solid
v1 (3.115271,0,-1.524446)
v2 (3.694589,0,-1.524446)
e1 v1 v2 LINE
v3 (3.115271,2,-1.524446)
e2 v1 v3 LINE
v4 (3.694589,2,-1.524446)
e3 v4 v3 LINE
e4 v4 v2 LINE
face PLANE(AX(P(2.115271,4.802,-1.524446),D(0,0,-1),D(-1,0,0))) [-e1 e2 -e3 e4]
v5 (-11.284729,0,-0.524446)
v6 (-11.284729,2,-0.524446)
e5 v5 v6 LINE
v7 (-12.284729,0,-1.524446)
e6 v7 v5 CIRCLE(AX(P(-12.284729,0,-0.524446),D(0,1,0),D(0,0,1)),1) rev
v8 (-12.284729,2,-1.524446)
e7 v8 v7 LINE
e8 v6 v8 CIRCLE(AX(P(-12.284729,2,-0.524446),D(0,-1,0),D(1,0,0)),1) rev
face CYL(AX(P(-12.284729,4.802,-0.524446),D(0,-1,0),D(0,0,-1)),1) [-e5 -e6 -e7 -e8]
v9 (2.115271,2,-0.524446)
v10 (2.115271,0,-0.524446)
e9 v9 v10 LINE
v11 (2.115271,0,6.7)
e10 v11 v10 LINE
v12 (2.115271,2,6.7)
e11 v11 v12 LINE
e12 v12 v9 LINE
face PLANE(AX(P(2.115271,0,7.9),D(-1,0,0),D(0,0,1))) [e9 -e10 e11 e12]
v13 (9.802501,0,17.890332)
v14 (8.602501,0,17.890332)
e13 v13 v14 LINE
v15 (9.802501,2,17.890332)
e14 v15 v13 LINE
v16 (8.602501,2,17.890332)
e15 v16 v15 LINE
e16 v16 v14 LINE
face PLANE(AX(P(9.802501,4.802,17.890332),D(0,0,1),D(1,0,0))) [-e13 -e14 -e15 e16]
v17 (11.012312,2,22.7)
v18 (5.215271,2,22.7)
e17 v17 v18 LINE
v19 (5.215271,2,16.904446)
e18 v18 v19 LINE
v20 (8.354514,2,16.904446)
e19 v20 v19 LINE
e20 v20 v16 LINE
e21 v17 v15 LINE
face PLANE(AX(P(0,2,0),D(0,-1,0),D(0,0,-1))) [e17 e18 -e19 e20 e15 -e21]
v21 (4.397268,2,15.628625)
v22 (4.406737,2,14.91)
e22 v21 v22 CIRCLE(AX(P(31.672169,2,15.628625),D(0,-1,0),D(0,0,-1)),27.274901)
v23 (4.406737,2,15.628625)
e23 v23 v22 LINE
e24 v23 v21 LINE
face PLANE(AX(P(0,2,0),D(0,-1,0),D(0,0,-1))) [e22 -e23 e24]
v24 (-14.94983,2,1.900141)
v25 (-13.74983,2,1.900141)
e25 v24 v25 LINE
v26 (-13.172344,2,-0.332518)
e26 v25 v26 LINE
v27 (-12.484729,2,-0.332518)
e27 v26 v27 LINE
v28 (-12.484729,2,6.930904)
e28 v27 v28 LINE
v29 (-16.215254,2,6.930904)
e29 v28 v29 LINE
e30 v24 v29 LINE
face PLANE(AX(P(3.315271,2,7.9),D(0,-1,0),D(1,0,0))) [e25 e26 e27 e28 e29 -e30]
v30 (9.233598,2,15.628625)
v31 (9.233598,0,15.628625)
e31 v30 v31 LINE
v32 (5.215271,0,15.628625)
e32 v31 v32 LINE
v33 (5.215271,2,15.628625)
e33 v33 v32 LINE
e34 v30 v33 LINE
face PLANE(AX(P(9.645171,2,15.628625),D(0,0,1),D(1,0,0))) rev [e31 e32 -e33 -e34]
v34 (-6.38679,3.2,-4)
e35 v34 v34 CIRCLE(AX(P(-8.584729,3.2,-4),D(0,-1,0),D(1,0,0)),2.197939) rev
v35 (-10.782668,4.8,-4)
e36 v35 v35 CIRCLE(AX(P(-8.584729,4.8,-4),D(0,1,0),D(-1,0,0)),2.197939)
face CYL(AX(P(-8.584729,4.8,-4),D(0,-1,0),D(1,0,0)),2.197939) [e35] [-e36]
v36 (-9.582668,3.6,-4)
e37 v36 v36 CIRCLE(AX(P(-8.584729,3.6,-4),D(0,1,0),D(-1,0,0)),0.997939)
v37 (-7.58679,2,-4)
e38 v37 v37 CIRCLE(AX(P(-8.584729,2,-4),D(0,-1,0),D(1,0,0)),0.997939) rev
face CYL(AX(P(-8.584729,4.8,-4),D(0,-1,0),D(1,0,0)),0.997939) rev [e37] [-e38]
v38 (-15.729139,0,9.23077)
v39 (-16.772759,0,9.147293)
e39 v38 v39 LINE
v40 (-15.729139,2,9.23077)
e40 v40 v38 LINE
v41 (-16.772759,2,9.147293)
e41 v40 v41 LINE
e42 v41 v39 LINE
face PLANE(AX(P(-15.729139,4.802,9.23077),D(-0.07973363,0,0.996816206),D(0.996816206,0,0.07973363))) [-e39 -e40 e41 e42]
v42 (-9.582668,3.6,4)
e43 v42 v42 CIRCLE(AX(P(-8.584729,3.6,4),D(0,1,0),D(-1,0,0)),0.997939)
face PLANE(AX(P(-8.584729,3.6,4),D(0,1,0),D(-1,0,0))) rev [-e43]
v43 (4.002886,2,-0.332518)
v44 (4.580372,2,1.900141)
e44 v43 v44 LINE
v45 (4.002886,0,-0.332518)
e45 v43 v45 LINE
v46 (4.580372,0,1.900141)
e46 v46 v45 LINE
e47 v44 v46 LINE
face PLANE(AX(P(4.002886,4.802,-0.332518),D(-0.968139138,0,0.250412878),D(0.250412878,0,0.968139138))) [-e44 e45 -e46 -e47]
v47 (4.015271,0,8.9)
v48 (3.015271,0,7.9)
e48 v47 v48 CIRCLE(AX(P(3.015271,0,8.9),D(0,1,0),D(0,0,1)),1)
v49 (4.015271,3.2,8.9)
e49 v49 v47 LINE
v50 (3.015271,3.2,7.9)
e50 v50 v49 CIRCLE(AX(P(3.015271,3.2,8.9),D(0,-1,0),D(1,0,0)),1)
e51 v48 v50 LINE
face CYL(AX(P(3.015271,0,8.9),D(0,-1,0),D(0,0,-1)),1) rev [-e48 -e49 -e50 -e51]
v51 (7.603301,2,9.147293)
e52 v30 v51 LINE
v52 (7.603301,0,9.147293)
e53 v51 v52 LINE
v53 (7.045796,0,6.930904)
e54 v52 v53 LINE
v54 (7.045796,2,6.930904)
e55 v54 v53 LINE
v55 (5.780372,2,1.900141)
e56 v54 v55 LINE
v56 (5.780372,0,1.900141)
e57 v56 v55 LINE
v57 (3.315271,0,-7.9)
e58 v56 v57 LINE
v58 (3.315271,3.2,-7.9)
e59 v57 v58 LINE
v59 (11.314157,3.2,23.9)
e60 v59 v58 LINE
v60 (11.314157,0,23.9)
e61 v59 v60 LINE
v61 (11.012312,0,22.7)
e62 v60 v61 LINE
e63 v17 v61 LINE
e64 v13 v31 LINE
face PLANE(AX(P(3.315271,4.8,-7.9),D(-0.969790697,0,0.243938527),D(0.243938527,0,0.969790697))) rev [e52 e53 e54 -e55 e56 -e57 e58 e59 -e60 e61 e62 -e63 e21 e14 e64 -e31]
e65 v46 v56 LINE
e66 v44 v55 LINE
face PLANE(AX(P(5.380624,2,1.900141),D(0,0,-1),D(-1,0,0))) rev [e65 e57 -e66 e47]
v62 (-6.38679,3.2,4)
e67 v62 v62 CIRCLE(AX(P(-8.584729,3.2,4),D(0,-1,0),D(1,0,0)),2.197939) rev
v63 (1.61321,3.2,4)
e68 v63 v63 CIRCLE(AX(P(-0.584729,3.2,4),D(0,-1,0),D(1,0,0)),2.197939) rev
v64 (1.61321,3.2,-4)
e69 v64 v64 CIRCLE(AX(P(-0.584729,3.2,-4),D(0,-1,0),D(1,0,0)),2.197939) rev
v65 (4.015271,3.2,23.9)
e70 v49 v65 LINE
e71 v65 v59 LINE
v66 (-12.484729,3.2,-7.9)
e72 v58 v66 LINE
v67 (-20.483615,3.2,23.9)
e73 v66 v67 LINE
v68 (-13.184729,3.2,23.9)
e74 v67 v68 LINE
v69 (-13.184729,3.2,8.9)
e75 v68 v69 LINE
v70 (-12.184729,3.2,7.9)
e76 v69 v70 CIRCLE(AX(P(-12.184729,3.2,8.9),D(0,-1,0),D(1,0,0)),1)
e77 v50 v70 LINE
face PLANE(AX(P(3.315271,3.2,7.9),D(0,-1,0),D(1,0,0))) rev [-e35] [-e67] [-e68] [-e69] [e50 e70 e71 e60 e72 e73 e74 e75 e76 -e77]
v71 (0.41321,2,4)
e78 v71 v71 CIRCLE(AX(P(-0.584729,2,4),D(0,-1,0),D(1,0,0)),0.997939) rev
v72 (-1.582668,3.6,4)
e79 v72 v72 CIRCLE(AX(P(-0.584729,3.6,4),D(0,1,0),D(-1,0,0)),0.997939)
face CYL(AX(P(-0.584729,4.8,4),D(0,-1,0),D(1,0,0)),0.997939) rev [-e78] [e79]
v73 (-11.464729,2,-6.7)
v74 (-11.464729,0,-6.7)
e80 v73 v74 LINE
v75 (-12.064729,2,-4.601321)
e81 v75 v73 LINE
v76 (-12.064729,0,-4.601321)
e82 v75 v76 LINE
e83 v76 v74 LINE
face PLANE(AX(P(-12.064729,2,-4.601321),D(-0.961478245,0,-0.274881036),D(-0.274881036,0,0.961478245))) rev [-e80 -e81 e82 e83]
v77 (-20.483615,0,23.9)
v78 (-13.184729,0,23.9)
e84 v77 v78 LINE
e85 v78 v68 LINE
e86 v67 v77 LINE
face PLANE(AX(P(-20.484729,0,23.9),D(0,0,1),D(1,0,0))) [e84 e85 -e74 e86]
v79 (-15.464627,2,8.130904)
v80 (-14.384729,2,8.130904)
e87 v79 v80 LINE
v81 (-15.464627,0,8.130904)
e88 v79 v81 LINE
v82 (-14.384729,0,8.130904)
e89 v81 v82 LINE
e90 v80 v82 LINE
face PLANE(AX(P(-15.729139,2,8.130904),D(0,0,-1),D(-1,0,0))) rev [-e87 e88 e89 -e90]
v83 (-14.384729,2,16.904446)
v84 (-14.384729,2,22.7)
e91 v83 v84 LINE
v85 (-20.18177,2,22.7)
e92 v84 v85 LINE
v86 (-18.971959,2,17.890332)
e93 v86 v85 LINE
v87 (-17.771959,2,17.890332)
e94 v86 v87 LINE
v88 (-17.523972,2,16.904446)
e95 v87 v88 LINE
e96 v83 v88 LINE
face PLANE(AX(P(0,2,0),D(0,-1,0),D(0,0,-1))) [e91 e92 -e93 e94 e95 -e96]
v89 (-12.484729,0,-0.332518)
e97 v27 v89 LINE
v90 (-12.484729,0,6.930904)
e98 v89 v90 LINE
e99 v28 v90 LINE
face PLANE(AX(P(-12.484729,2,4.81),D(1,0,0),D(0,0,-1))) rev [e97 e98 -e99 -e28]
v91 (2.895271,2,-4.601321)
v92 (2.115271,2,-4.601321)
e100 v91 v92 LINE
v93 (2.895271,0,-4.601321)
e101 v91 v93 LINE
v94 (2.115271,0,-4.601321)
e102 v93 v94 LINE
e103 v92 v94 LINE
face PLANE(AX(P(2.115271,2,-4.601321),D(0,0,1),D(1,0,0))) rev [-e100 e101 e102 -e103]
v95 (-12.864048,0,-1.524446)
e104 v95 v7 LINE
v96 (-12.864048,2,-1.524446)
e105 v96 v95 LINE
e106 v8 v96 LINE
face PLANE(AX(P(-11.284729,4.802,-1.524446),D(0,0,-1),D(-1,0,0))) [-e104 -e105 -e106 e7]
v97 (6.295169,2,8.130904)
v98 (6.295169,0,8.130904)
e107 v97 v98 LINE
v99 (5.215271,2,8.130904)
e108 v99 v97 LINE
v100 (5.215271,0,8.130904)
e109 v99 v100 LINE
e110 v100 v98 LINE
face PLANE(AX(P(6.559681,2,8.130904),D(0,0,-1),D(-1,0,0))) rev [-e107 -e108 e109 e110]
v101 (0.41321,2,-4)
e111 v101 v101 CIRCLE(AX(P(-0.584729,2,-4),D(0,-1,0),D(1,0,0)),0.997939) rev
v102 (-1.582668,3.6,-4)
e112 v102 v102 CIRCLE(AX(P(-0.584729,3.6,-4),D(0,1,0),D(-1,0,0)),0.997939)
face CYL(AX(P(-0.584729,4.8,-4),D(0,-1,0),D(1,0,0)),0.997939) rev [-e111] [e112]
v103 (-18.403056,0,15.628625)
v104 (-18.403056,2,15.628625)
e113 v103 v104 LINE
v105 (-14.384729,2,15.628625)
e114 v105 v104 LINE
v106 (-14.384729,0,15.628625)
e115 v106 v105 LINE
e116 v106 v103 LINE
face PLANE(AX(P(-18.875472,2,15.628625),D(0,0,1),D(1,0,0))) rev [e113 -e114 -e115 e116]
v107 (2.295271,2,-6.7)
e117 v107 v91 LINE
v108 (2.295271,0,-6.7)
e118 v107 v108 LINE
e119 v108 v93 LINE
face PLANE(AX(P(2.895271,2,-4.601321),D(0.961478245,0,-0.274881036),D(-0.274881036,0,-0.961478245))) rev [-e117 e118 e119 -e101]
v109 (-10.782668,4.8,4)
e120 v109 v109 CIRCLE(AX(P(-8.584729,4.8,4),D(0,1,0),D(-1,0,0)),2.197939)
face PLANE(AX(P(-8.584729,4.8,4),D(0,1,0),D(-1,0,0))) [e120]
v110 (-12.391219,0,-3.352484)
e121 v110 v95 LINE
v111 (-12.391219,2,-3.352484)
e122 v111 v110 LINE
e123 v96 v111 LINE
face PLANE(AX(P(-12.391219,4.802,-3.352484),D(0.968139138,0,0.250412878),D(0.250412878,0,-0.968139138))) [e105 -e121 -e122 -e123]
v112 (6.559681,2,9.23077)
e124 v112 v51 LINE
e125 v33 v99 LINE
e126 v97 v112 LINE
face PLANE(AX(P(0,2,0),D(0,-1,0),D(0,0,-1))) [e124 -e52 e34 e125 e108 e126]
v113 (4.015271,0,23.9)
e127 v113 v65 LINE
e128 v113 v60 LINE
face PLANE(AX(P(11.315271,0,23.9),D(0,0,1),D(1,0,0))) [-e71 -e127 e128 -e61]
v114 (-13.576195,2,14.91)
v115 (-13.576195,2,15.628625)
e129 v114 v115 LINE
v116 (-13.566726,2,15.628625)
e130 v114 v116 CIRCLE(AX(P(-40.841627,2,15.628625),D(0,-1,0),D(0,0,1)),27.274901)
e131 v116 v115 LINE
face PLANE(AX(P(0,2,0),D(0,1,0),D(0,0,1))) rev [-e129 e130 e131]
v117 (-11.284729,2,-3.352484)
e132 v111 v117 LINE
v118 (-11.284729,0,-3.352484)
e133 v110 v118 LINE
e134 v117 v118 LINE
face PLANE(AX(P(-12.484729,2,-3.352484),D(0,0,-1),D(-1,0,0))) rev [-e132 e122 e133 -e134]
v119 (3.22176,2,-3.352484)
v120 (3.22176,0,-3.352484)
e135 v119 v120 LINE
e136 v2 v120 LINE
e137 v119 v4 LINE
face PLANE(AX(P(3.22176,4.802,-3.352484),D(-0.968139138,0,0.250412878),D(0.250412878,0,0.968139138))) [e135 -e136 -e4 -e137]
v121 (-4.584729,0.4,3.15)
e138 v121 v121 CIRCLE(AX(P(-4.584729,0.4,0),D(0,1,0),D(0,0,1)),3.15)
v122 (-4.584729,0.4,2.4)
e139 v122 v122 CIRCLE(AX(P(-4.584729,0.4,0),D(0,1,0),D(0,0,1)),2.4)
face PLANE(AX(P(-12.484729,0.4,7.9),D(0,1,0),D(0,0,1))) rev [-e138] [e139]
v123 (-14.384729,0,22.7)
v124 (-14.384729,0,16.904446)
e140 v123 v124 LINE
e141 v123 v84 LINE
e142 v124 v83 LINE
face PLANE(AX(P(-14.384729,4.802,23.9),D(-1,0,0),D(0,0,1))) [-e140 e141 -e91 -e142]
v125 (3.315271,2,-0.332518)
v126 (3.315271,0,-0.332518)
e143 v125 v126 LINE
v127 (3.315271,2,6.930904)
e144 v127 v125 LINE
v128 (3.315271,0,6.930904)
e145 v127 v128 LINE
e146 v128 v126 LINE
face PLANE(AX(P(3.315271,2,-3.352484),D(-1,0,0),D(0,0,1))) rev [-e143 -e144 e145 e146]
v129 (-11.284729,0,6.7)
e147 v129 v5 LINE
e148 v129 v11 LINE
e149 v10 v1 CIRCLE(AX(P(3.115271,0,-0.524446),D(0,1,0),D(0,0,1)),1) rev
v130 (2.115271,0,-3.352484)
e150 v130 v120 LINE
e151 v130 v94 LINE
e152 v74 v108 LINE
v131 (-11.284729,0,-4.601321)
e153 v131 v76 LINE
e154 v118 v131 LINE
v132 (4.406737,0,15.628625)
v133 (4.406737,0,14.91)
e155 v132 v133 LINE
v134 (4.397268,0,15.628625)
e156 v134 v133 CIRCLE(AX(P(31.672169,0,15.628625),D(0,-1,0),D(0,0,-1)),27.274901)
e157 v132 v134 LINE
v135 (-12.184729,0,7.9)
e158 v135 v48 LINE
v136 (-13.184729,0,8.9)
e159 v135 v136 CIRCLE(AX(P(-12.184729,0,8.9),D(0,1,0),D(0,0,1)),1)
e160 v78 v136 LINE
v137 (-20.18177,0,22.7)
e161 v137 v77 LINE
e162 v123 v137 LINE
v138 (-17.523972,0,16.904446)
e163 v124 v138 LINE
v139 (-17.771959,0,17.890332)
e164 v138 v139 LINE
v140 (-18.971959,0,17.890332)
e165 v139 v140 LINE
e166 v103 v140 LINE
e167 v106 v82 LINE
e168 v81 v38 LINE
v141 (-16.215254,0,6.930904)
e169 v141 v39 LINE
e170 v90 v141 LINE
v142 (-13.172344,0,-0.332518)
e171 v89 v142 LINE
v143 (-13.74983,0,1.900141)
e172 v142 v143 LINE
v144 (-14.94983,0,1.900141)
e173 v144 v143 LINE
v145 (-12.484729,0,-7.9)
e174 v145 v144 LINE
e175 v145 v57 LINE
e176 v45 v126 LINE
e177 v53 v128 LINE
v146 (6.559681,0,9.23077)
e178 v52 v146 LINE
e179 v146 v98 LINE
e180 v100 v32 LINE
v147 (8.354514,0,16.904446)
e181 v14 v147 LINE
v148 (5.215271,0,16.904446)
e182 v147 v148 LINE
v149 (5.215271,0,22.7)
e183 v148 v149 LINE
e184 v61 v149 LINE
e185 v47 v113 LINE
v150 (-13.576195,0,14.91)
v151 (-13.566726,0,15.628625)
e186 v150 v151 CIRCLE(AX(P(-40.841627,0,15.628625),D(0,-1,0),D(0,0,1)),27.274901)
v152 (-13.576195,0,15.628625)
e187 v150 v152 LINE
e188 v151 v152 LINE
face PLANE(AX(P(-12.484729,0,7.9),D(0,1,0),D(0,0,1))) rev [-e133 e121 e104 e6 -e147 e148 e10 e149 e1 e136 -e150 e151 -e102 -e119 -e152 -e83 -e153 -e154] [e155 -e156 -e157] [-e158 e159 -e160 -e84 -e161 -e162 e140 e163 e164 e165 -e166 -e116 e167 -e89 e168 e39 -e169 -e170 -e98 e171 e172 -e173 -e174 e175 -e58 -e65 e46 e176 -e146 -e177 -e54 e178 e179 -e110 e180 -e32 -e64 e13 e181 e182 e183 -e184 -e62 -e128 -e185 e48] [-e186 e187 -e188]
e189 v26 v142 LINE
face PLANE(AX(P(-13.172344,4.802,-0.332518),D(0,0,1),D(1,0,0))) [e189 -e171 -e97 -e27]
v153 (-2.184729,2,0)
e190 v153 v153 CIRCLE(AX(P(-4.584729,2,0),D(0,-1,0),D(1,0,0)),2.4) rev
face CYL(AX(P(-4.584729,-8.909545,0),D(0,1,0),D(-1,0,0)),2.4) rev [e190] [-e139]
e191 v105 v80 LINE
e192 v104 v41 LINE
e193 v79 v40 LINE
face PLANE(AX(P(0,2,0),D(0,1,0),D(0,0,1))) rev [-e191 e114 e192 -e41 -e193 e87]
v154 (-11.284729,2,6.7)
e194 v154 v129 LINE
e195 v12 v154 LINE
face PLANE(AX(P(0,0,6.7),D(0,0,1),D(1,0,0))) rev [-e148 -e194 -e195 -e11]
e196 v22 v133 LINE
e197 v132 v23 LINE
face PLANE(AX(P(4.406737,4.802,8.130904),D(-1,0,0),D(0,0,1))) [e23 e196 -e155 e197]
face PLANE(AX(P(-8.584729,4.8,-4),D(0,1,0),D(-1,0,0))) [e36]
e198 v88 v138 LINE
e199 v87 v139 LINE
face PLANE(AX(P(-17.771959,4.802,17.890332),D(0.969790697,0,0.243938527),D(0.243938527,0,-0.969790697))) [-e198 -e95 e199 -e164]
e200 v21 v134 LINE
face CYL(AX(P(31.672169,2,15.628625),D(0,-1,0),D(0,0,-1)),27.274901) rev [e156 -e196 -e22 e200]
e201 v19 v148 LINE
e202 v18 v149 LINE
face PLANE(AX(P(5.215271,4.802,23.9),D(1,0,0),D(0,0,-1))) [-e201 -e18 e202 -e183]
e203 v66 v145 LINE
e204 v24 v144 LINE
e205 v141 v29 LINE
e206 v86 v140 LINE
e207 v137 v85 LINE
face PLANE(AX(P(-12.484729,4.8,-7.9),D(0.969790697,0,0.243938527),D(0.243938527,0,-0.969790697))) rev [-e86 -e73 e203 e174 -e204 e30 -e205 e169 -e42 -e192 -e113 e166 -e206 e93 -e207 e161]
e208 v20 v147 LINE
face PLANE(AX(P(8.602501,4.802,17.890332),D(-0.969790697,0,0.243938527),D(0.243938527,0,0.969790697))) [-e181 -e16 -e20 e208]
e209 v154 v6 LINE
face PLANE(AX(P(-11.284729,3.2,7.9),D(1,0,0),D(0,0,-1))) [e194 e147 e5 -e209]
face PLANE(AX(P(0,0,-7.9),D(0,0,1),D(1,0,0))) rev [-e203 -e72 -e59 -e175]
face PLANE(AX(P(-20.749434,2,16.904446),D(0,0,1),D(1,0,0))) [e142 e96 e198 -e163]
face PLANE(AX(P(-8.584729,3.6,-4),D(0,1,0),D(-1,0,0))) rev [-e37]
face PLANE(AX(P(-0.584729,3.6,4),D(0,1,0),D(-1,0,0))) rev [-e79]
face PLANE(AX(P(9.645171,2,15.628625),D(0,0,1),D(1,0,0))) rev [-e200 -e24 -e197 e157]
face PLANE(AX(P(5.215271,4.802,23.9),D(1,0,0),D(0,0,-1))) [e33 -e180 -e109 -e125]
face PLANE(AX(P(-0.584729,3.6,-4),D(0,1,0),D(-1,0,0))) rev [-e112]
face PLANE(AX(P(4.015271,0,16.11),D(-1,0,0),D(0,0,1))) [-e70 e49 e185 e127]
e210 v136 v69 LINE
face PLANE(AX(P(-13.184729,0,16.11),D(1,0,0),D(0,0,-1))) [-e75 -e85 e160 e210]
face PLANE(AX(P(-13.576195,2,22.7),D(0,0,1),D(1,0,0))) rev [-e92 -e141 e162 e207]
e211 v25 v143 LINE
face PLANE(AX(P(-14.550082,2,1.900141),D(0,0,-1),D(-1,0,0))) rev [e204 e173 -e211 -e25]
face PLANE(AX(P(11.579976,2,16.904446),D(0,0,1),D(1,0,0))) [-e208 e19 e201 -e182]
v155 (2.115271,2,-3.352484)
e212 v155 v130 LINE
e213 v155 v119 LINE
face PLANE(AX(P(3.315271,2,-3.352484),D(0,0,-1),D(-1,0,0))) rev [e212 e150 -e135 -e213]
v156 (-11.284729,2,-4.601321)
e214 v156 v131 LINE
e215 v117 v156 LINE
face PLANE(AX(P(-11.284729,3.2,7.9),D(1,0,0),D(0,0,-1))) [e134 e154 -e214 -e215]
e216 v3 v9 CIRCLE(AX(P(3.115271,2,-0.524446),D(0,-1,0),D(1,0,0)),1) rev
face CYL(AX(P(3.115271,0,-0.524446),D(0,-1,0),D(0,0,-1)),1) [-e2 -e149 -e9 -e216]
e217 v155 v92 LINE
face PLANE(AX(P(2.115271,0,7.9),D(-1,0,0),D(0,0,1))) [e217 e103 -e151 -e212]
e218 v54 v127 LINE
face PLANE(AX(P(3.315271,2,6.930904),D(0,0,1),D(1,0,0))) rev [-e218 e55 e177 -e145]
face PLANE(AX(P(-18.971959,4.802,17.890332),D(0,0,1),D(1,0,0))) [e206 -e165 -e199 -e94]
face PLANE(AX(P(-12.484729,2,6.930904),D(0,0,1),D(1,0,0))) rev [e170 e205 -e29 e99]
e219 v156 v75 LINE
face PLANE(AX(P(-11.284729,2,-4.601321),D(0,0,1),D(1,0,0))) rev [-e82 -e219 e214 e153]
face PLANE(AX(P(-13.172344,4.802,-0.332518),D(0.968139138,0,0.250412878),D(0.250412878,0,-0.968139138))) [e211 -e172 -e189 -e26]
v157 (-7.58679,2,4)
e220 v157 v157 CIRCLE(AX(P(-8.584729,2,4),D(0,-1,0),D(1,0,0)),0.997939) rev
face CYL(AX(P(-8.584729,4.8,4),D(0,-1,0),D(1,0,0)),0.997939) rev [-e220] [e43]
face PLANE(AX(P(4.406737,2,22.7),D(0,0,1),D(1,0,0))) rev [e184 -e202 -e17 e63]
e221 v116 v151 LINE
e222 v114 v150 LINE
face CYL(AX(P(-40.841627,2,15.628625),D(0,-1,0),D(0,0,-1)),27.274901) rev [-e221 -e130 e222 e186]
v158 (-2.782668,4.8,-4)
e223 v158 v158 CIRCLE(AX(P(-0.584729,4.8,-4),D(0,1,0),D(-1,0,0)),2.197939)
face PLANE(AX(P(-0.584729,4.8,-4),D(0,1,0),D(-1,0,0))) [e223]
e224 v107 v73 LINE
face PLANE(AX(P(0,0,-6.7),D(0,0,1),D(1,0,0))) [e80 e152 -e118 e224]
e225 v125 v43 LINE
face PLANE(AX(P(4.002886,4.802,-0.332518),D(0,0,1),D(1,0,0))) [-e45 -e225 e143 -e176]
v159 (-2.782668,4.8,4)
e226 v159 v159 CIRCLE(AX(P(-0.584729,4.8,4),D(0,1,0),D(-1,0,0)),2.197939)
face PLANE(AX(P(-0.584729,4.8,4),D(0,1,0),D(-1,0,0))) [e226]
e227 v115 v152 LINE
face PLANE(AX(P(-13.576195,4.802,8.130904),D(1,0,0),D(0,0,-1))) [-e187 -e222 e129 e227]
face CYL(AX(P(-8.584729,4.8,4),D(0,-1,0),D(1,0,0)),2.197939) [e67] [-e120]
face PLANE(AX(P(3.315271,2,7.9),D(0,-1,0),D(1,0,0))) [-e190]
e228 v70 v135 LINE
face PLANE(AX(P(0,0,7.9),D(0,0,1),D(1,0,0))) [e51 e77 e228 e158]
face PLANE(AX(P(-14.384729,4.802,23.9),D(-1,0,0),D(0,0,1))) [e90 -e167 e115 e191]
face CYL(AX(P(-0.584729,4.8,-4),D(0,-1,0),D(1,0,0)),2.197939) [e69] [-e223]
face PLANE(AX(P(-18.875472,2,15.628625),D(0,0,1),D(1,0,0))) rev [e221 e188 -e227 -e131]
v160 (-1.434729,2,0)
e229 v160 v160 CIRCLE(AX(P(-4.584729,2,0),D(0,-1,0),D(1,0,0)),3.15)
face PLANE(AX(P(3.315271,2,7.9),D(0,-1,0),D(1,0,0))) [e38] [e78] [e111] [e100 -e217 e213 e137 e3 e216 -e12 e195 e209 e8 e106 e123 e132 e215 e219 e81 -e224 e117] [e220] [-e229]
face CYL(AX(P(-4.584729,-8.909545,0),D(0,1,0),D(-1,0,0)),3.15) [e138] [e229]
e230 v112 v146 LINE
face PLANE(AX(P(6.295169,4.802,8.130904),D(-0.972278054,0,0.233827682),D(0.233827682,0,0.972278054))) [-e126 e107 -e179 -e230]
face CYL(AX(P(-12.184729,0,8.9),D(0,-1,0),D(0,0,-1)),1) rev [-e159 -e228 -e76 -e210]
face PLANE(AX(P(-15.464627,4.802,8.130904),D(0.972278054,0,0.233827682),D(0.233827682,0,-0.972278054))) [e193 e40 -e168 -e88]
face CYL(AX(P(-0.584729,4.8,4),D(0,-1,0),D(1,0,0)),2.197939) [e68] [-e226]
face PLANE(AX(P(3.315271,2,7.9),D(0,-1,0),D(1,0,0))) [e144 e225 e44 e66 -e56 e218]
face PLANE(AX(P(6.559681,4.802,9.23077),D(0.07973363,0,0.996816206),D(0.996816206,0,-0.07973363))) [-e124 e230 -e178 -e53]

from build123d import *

# Parameters (mm, degrees)
BASEFRAMESKETCH_W           = 15.8
BASEFRAMESKETCH_H           = 3.2
BASEFRAME_DEPTH             = 7.9
STUDSSKETCH_R               = 2.197938665
STUDS_DEPTH                 = 1.6
MAINSTUDSPATTERN_COUNT      = 2
MAINSTUDSPATTERN_PITCH      = 8
MAINSTUDSPATTERN_COUNT_DIR2 = 2
MAINSTUDSPATTERN_PITCH_DIR2 = 8
MAINBASESHELL_T             = -1.2
UNDERCIRCLESKETCH_R         = 3.15
UNDERCIRCLESKETCH_R_2       = 2.4
UNDERCIRCLEEXTRUDE_DEPTH    = 1.6
ASHAPEDEDGECUT_DEPTH        = 2
MOVE_FACE2_DEPTH            = 3.2
FILLET11_R                  = 1
SKETCH120_W                 = 2.012808249
SKETCH120_H                 = 1.2
SKETCH120_W_2               = 1.2
SKETCH120_H_2               = 0.829639146
CUT_EXTRUDE44_DEPTH         = 2
SKETCH122_W                 = 1.2
SKETCH122_H                 = 3.019966153
CUT_EXTRUDE45_DEPTH         = 2
CUT_EXTRUDE46_DEPTH         = 34.570089444
BOSS_EXTRUDE28_REACH        = 33.841
SKETCH125_W                 = 0.808534165
SKETCH125_H                 = 7.497721331
SKETCH125_H_2               = 5.795554142
FILLET12_R                  = 1


# Read off the part's stored shape, not the designer's step: Move Face2
with BuildPart() as part:
    # BaseFrameSketch → BaseFrame (new, symmetric)
    with BuildSketch(Plane.XY):
        with Locations((-4.584729064, 1.6)):
            Rectangle(BASEFRAMESKETCH_W, BASEFRAMESKETCH_H)
    extrude(amount=BASEFRAME_DEPTH, both=True)

    # StudsSketch → Studs (add)
    with BuildSketch(Plane(origin=(0, 3.2, 0), x_dir=(1, 0, 0), z_dir=(0, 1, 0))):
        with Locations((-8.584729064, 4)):
            Circle(STUDSSKETCH_R)
    studs = extrude(amount=STUDS_DEPTH)

    # MainStudsPattern: Studs 2 × 2
    with Locations(*[(i * MAINSTUDSPATTERN_PITCH, 0, j * MAINSTUDSPATTERN_PITCH_DIR2) for i in range(MAINSTUDSPATTERN_COUNT) for j in range(MAINSTUDSPATTERN_COUNT_DIR2) if (i, j) != (0, 0)]):
        add(studs)

    # MainBaseShell
    mainbaseshell_openings = [part.faces().sort_by_distance(p)[0] for p in [
        (-4.584729064, 0, 0),
    ]]
    offset(amount=MAINBASESHELL_T, openings=mainbaseshell_openings, kind=Kind.INTERSECTION)

    # UnderCircleSketch → UnderCircleExtrude (add)
    with BuildSketch(Plane(origin=(0, 2, 0), x_dir=(-1, 0, 0), z_dir=(0, -1, 0))):
        with Locations(Location((4.584729064, 0, 0), (0, 0, 270))):
            Circle(UNDERCIRCLESKETCH_R)
        with Locations(Location((4.584729064, 0, 0), (0, 0, 270))):
            Circle(UNDERCIRCLESKETCH_R_2, mode=Mode.SUBTRACT)
    extrude(amount=UNDERCIRCLEEXTRUDE_DEPTH)

    # Sweep1: sweep along a curve in space
    with BuildLine() as sweep1_path:
        Line((3.315270936, 0, 7.9), (3.315270936, 3.2, 7.9))
    # Sketch10 → Sweep1 (sweep)
    with BuildSketch(Plane(origin=(0, 3.2, 0), x_dir=(1, 0, 0), z_dir=(0, 1, 0))):
        Polygon((-20.484729064, -16.11), (-13.184729064, -16.11), (-13.184729064, -7.9), (-12.484729064, -7.9), (-12.484729064, 7.9), align=None)
        Polygon((4.015270936, -7.9), (3.315270936, -7.9), (3.315270936, 7.9), (11.315270936, -16.11), (4.015270936, -16.11), align=None)
    sweep(path=sweep1_path.line)

    # Sketch11 → AShapedEdgeCut (cut)
    with BuildSketch(Plane(origin=(0, 0, 0), x_dir=(-1, 0, 0), z_dir=(0, -1, 0))):
        Polygon((-3.315270936, 3.352483875), (-3.598074089, 3.352483875), (-5.380624164, -1.900141374), (-6.580624164, -1.900141374), (-8.256846476, -6.930903588), (-3.315270936, -6.930903588), (-3.315270936, -4.81), (-5.328079185, -4.81), (-5.328079185, -3.61), (-3.315270936, -3.61), align=None)
        Polygon((-7.759680606, -8.895572671), (-7.759680606, -9.725211817), (-6.559680606, -9.725211817), (-6.559680606, -8.130903588), (-4.406736771, -8.130903588), (-4.406736771, -14.91), (-9.466166686, -14.91), (-9.466166686, -14.321814496), (-10.576862573, -13.893851901), (-8.911463413, -8.895572671), align=None)
        Polygon((-2.115270936, 4.601321399), (-2.895270936, 4.601321399), (-2.295270936, 6.7), (-2.115270936, 6.7), align=None)
        Polygon((18.635624814, -14.321814496), (19.746320701, -13.893851901), (18.080921541, -8.895572671), (16.929138734, -8.895572671), (16.929138734, -9.725211817), (15.729138734, -9.725211817), (15.729138734, -8.130903588), (13.576194899, -8.130903588), (13.576194899, -14.91), (18.635624814, -14.91), align=None)
        Polygon((12.484729064, -6.930903588), (17.426304604, -6.930903588), (15.750082292, -1.900141374), (14.550082292, -1.900141374), (12.767532217, 3.352483875), (12.484729064, 3.352483875), (12.484729064, -3.61), (14.497537313, -3.61), (14.497537313, -4.81), (12.484729064, -4.81), align=None)
        Polygon((12.064729064, 4.601321399), (11.464729064, 6.7), (11.284729064, 6.7), (11.284729064, 4.601321399), align=None)
    extrude(amount=-ASHAPEDEDGECUT_DEPTH, mode=Mode.SUBTRACT)

    # Move Face2 outline → Move Face2 (add)
    with BuildSketch(Plane(origin=(0, 0, 0), x_dir=(1, 0, 0), z_dir=(0, 1, 0))):
        Polygon((-13.184729064, -16.11), (-20.484729064, -16.11), (-23.080314237, -23.9), (-13.184729064, -23.9), align=None)
        Polygon((4.015270936, -16.11), (4.015270936, -23.9), (13.910856109, -23.9), (11.315270936, -16.11), align=None)
    extrude(amount=MOVE_FACE2_DEPTH)

    # Fillet11
    fillet11_edges = [part.edges().sort_by_distance(p)[0] for p in [
        (-13.184729064, 1.6, 7.9),
        (4.015270936, 1.6, 7.9),
    ]]
    fillet(fillet11_edges, radius=FILLET11_R)

    # Sketch120 → Cut-Extrude44 (cut)
    with BuildSketch(Plane(origin=(0, 0, 0), x_dir=(-1, 0, 0), z_dir=(0, -1, 0))):
        with Locations((-4.321675061, -4.21)):
            Rectangle(SKETCH120_W, SKETCH120_H)
        Polygon((-4.406736771, -16.11), (-4.406736771, -22.7), (-11.974329928, -22.7), (-11.557573226, -21.355984621), (-12.912753937, -20.904445858), (-11.315270936, -16.11), align=None)
        with Locations((-7.159680606, -9.310392244)):
            Rectangle(SKETCH120_W_2, SKETCH120_H_2)
        Polygon((13.576194899, -16.11), (20.484729064, -16.11), (22.082212066, -20.904445858), (20.727031354, -21.355984621), (21.143788056, -22.7), (13.576194899, -22.7), align=None)
        with Locations((16.329138734, -9.310392244)):
            Rectangle(SKETCH120_W_2, SKETCH120_H_2)
        with Locations((13.491133189, -4.21)):
            Rectangle(SKETCH120_W, SKETCH120_H)
    extrude(amount=-CUT_EXTRUDE44_DEPTH, mode=Mode.SUBTRACT)

    # Sweep30: sweep along a curve in space
    with BuildLine() as sweep30_path:
        Line((11.315270936, 2, 16.11), (11.315270936, 0, 16.11))
    # Sketch121 → Sweep30 (sweep)
    with BuildSketch(Plane(origin=(0, 0, 0), x_dir=(-1, 0, 0), z_dir=(0, -1, 0))):
        Polygon((-11.579975928, -16.904445858), (-4.406736771, -16.904445858), (-4.406736771, -15.858354428), (-11.231424015, -15.858354428), align=None)
        Polygon((13.576194899, -15.858354428), (20.400882143, -15.858354428), (20.749434056, -16.904445858), (13.576194899, -16.904445858), align=None)
    sweep(path=sweep30_path.line)

    # Sketch122 → Cut-Extrude45 (cut)
    with BuildSketch(Plane(origin=(0, 0, 0), x_dir=(-1, 0, 0), z_dir=(0, -1, 0))):
        with BuildLine():
            Line((-9.466166686, -14.321814496), (-9.706013399, -15.628624919))
            Line((-9.706013399, -15.628624919), (-9.645171378, -15.628624919))
            Line((-9.645171378, -15.628624919), (-4.39726815, -15.628624919))
            ThreePointArc((-4.39726815, -15.628624919), (-4.399635408, -15.269281271), (-4.406736771, -14.91))
            Line((-4.406736771, -14.91), (-9.360110841, -14.91))
            Line((-9.360110841, -14.91), (-9.466166686, -14.91))
            Line((-9.466166686, -14.91), (-9.466166686, -14.321814496))
        make_face()
        with BuildLine():
            Line((18.635624814, -14.321814496), (18.635624814, -14.91))
            Line((18.635624814, -14.91), (18.529568969, -14.91))
            Line((18.529568969, -14.91), (13.576194899, -14.91))
            ThreePointArc((13.576194899, -14.91), (13.569093536, -15.269281271), (13.566726278, -15.628624919))
            Line((13.566726278, -15.628624919), (18.814629506, -15.628624919))
            Line((18.814629506, -15.628624919), (18.875471527, -15.628624919))
            Line((18.875471527, -15.628624919), (18.635624814, -14.321814496))
        make_face()
        with Locations((-2.715270936, 1.842500799)):
            Rectangle(SKETCH122_W, SKETCH122_H)
        with Locations((11.884729064, 1.842500799)):
            Rectangle(SKETCH122_W, SKETCH122_H)
    extrude(amount=-CUT_EXTRUDE45_DEPTH, mode=Mode.SUBTRACT)

    # Sketch123 → Cut-Extrude46 (cut, through all)
    with BuildSketch(Plane(origin=(0, 0, 0), x_dir=(-1, 0, 0), z_dir=(0, -1, 0))):
        Polygon((-11.314156863, -23.9), (-13.910856109, -23.9), (-3.315270936, 7.9), align=None)
        Polygon((20.483614991, -23.9), (23.080314237, -23.9), (12.484729064, 7.9), align=None)
    extrude(amount=-CUT_EXTRUDE46_DEPTH, mode=Mode.SUBTRACT)

    # Sketch125 → Boss-Extrude28 (add, up to next)
    with BuildSketch(Plane(origin=(0, 0, 0), x_dir=(-1, 0, 0), z_dir=(0, -1, 0)), mode=Mode.PRIVATE) as boss_extrude28_sk1:
        Polygon((-3.598074089, 3.352483875), (-5.380624164, -1.900141374), (-4.580371971, -1.900141374), (-4.002886188, 0.332517722), (-2.115270936, 0.332517722), (-2.115270936, 1.524445932), (-3.694589414, 1.524445932), (-3.221760433, 3.352483875), align=None)
    boss_extrude28_tool1 = extrude(boss_extrude28_sk1.sketch, amount=-BOSS_EXTRUDE28_REACH, mode=Mode.PRIVATE) - part.part
    # Sketch125 → Boss-Extrude28 (add, up to next)
    with BuildSketch(Plane(origin=(0, 0, 0), x_dir=(-1, 0, 0), z_dir=(0, -1, 0)), mode=Mode.PRIVATE) as boss_extrude28_sk2:
        Polygon((13.749830099, -1.900141374), (14.550082292, -1.900141374), (12.767532217, 3.352483875), (12.391218561, 3.352483875), (12.864047542, 1.524445932), (11.284729064, 1.524445932), (11.284729064, 0.332517722), (13.172344316, 0.332517722), align=None)
    boss_extrude28_tool2 = extrude(boss_extrude28_sk2.sketch, amount=-BOSS_EXTRUDE28_REACH, mode=Mode.PRIVATE) - part.part
    # Sketch125 → Boss-Extrude28 (add, up to next)
    with BuildSketch(Plane(origin=(0, 0, 0), x_dir=(-1, 0, 0), z_dir=(0, -1, 0)), mode=Mode.PRIVATE) as boss_extrude28_sk3:
        Polygon((-6.559680606, -8.895572671), (-7.539983825, -8.895572671), (-7.603300806, -9.147292725), (-6.559680606, -9.230770127), (-6.295168575, -8.130903588), (-6.559680606, -8.130903588), align=None)
    boss_extrude28_tool3 = extrude(boss_extrude28_sk3.sketch, amount=-BOSS_EXTRUDE28_REACH, mode=Mode.PRIVATE) - part.part
    # Sketch125 → Boss-Extrude28 (add, up to next)
    with BuildSketch(Plane(origin=(0, 0, 0), x_dir=(-1, 0, 0), z_dir=(0, -1, 0)), mode=Mode.PRIVATE) as boss_extrude28_sk4:
        with Locations((-4.811003854, -11.879764254)):
            Rectangle(SKETCH125_W, SKETCH125_H)
    boss_extrude28_tool4 = extrude(boss_extrude28_sk4.sketch, amount=-BOSS_EXTRUDE28_REACH, mode=Mode.PRIVATE) - part.part
    # Sketch125 → Boss-Extrude28 (add, up to next)
    with BuildSketch(Plane(origin=(0, 0, 0), x_dir=(-1, 0, 0), z_dir=(0, -1, 0)), mode=Mode.PRIVATE) as boss_extrude28_sk5:
        Polygon((16.772758935, -9.147292725), (16.709441953, -8.895572671), (15.729138734, -8.895572671), (15.729138734, -8.130903588), (15.464626703, -8.130903588), (15.729138734, -9.230770127), align=None)
    boss_extrude28_tool5 = extrude(boss_extrude28_sk5.sketch, amount=-BOSS_EXTRUDE28_REACH, mode=Mode.PRIVATE) - part.part
    # Sketch125 → Boss-Extrude28 (add, up to next)
    with BuildSketch(Plane(origin=(0, 0, 0), x_dir=(-1, 0, 0), z_dir=(0, -1, 0)), mode=Mode.PRIVATE) as boss_extrude28_sk6:
        with Locations((-4.811003854, -19.802222929)):
            Rectangle(SKETCH125_W, SKETCH125_H_2)
    boss_extrude28_tool6 = extrude(boss_extrude28_sk6.sketch, amount=-BOSS_EXTRUDE28_REACH, mode=Mode.PRIVATE) - part.part
    # Sketch125 → Boss-Extrude28 (add, up to next)
    with BuildSketch(Plane(origin=(0, 0, 0), x_dir=(-1, 0, 0), z_dir=(0, -1, 0)), mode=Mode.PRIVATE) as boss_extrude28_sk7:
        Polygon((-8.602501167, -17.890331705), (-8.354514109, -16.904445858), (-9.554514109, -16.904445858), (-9.802501167, -17.890331705), align=None)
    boss_extrude28_tool7 = extrude(boss_extrude28_sk7.sketch, amount=-BOSS_EXTRUDE28_REACH, mode=Mode.PRIVATE) - part.part
    # Sketch125 → Boss-Extrude28 (add, up to next)
    with BuildSketch(Plane(origin=(0, 0, 0), x_dir=(-1, 0, 0), z_dir=(0, -1, 0)), mode=Mode.PRIVATE) as boss_extrude28_sk8:
        with Locations((13.980461981, -11.879764254)):
            Rectangle(SKETCH125_W, SKETCH125_H)
    boss_extrude28_tool8 = extrude(boss_extrude28_sk8.sketch, amount=-BOSS_EXTRUDE28_REACH, mode=Mode.PRIVATE) - part.part
    # Sketch125 → Boss-Extrude28 (add, up to next)
    with BuildSketch(Plane(origin=(0, 0, 0), x_dir=(-1, 0, 0), z_dir=(0, -1, 0)), mode=Mode.PRIVATE) as boss_extrude28_sk9:
        with Locations((13.980461981, -19.802222929)):
            Rectangle(SKETCH125_W, SKETCH125_H_2)
    boss_extrude28_tool9 = extrude(boss_extrude28_sk9.sketch, amount=-BOSS_EXTRUDE28_REACH, mode=Mode.PRIVATE) - part.part
    # Sketch125 → Boss-Extrude28 (add, up to next)
    with BuildSketch(Plane(origin=(0, 0, 0), x_dir=(-1, 0, 0), z_dir=(0, -1, 0)), mode=Mode.PRIVATE) as boss_extrude28_sk10:
        Polygon((18.723972237, -16.904445858), (17.523972237, -16.904445858), (17.771959295, -17.890331705), (18.971959295, -17.890331705), align=None)
    boss_extrude28_tool10 = extrude(boss_extrude28_sk10.sketch, amount=-BOSS_EXTRUDE28_REACH, mode=Mode.PRIVATE) - part.part
    add(boss_extrude28_tool1.solids().sort_by_distance((3.766497, 0, -0.611125))[0])
    add(boss_extrude28_tool2.solids().sort_by_distance((-12.935955, 0, -0.611125))[0])
    add(boss_extrude28_tool3.solids().sort_by_distance((7.049832, 0, 8.912663))[0])
    add(boss_extrude28_tool4.solids().sort_by_distance((4.811004, 0, 11.879764))[0])
    add(boss_extrude28_tool5.solids().sort_by_distance((-16.724526, 0, 9.025602))[0])
    add(boss_extrude28_tool6.solids().sort_by_distance((4.811004, 0, 19.802223))[0])
    add(boss_extrude28_tool7.solids().sort_by_distance((9.078508, 0, 17.397389))[0])
    add(boss_extrude28_tool8.solids().sort_by_distance((-13.980462, 0, 11.879764))[0])
    add(boss_extrude28_tool9.solids().sort_by_distance((-13.980462, 0, 19.802223))[0])
    add(boss_extrude28_tool10.solids().sort_by_distance((-18.247966, 0, 17.397389))[0])

    # Fillet12
    fillet12_edges = [part.edges().sort_by_distance(p)[0] for p in [
        (-11.284729064, 1, -1.524445932),
        (2.115270936, 1, -1.524445932),
    ]]
    fillet(fillet12_edges, radius=FILLET12_R)


solid = part.part
